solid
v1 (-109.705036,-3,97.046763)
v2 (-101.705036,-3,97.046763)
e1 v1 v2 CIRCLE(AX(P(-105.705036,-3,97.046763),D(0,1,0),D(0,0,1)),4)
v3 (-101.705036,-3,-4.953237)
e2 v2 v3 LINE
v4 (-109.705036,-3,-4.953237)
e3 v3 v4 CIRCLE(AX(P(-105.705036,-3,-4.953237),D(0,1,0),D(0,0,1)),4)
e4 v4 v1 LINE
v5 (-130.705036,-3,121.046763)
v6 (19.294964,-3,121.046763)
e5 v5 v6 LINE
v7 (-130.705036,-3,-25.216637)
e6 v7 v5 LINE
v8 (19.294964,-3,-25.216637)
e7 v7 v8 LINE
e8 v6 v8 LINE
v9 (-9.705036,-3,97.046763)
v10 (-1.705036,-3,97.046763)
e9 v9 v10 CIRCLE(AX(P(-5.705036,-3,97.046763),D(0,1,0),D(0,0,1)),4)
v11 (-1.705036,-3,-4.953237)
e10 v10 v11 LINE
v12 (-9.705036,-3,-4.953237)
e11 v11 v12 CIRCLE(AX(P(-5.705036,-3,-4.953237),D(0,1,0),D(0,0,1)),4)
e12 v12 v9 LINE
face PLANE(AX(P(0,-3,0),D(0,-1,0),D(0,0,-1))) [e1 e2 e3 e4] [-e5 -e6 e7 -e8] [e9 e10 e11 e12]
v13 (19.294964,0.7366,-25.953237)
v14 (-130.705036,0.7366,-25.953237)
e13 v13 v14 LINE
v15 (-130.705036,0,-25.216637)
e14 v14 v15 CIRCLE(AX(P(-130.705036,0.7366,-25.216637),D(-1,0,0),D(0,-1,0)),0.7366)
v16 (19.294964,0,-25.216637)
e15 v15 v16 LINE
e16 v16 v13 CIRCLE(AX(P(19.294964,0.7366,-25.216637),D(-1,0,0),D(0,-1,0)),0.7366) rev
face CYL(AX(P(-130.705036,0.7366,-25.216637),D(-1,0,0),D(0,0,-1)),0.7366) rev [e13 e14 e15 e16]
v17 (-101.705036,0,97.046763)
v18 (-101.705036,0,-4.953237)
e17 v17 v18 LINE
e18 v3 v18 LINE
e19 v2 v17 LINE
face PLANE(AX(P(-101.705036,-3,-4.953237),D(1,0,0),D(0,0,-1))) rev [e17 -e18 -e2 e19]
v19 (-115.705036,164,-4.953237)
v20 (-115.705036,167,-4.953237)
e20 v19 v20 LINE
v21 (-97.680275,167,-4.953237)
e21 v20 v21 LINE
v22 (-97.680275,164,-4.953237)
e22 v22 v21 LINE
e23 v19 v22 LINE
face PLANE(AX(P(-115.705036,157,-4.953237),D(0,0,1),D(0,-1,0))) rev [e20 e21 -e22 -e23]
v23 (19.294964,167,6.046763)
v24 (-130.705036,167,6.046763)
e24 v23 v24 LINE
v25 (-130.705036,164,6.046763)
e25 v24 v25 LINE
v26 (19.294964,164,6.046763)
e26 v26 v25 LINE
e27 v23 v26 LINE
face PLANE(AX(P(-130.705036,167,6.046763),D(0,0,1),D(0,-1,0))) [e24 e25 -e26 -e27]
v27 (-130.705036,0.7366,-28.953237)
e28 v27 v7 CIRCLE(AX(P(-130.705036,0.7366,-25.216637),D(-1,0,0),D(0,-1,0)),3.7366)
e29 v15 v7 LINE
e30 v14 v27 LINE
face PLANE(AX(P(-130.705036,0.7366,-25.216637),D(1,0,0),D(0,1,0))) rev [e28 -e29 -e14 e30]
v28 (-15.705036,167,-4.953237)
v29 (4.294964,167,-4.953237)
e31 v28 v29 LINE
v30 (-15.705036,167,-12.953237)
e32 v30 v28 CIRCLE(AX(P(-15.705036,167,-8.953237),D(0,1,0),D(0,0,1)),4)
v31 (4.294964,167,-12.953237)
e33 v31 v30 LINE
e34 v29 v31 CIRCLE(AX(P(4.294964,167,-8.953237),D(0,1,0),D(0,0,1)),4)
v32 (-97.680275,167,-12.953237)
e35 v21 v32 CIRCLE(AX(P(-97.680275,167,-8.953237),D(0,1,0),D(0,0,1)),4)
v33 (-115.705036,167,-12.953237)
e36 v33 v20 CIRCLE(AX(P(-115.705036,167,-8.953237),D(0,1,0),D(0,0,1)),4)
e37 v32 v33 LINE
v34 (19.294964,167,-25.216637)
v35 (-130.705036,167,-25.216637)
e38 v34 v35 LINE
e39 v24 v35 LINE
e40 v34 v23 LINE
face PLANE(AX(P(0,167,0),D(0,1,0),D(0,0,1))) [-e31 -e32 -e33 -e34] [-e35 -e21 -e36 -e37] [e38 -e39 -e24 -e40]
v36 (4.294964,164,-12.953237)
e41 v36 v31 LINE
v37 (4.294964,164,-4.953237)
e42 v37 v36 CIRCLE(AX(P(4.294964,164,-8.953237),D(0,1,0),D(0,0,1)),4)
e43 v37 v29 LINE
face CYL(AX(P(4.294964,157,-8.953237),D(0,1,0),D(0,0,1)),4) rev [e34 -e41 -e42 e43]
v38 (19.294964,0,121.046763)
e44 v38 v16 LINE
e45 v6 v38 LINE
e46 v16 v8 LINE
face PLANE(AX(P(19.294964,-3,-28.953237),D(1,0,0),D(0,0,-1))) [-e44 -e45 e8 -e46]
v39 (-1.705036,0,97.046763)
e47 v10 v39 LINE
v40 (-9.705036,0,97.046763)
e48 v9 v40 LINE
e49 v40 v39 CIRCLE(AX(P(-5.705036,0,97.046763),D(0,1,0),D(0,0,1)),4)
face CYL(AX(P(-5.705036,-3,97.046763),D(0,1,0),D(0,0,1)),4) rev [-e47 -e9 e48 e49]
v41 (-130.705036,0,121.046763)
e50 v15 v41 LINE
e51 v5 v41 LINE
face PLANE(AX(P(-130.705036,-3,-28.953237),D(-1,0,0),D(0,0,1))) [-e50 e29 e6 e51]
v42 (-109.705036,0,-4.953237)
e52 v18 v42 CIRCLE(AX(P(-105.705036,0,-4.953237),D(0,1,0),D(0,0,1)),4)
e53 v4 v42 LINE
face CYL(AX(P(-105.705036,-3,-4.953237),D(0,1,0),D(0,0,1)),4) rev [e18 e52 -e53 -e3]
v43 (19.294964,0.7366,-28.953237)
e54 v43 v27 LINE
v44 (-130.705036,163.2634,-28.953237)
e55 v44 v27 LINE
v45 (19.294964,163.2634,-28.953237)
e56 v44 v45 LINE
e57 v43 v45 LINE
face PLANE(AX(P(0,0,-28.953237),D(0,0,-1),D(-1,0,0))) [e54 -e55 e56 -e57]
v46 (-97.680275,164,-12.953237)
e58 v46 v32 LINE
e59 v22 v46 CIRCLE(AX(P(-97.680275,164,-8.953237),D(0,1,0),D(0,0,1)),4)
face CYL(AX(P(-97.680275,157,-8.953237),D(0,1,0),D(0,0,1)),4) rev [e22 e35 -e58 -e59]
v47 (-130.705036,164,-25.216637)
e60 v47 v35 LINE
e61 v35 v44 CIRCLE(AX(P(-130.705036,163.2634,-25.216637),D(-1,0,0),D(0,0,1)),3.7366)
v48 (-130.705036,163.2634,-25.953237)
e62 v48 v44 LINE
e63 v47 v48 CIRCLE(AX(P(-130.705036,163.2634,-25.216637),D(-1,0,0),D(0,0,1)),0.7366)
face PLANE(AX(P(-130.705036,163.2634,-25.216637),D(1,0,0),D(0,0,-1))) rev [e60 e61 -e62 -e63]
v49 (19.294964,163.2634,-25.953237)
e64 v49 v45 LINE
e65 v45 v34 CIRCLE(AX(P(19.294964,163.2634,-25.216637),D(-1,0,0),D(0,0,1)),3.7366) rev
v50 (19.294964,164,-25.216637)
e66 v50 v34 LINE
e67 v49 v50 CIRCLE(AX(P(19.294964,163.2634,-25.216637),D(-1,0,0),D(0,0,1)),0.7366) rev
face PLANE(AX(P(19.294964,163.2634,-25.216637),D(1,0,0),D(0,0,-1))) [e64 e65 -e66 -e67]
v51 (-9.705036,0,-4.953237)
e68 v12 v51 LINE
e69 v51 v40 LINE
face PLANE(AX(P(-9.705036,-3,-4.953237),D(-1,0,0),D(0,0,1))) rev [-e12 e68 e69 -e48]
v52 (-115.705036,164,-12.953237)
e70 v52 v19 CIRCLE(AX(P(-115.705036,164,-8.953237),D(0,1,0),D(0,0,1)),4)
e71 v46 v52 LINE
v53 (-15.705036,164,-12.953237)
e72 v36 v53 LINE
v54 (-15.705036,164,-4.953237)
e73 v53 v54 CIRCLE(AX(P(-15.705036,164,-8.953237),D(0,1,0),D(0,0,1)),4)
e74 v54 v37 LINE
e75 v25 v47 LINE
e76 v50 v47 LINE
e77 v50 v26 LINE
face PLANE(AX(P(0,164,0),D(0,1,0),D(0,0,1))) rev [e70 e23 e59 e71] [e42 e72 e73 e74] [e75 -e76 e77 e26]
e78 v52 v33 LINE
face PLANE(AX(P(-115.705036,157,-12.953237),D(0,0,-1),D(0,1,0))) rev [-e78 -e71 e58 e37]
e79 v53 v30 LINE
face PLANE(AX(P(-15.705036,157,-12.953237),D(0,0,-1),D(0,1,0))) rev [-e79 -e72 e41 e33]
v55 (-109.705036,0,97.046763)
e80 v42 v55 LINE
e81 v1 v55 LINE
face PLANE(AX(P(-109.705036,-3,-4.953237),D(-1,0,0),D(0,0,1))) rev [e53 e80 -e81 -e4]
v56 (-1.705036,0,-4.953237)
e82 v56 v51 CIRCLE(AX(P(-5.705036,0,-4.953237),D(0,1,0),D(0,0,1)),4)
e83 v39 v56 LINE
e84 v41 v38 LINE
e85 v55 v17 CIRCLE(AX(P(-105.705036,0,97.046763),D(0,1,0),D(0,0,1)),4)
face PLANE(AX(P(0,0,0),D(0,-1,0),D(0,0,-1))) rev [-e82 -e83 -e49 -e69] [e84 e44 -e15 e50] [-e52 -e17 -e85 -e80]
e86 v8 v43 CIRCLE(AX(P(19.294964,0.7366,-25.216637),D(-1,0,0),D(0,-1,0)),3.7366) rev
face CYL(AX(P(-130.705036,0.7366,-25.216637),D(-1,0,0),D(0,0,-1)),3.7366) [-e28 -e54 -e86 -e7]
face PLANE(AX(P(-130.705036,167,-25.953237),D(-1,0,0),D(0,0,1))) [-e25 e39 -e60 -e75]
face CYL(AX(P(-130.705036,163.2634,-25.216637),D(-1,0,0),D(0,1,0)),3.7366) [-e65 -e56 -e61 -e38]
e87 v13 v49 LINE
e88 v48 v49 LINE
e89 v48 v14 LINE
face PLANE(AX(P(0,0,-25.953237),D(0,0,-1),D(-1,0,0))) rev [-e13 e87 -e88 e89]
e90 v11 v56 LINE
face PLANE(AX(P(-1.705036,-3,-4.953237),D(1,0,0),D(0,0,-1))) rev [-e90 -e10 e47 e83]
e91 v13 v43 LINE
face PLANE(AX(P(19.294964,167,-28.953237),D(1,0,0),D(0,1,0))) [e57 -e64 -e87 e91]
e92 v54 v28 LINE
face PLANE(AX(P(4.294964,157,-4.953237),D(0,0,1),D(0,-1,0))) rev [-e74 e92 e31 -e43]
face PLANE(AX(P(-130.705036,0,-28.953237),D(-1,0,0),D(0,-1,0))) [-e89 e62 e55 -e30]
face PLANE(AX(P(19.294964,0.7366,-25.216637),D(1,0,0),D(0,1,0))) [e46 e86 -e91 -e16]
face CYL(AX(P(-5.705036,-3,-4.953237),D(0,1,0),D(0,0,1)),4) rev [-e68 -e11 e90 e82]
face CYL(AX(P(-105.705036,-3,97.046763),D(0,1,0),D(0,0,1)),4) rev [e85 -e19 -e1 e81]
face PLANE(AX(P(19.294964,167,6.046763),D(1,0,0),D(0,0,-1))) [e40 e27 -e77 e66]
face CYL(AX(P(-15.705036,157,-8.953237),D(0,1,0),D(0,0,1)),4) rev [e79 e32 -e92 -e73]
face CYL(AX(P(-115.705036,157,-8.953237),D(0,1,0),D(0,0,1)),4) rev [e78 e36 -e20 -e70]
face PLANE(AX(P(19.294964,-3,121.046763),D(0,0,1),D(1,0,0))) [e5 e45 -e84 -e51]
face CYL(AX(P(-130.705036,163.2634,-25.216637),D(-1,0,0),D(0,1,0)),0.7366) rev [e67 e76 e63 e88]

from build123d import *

# Parameters (mm, degrees)
SKETCH1_W                    = 150
SKETCH1_H                    = 150
BASE_FLANGE1_DEPTH           = 3
EDGE_FLANGE1_STRIP_W         = 13.4732
EDGE_FLANGE1_STRIP_H         = 3
EDGE_FLANGE1_STRIP_CUT_DEPTH = 150
EDGE_FLANGE1_DEPTH           = 150
EDGE_FLANGE2_STRIP_W         = 13.4732
EDGE_FLANGE2_STRIP_H         = 3
EDGE_FLANGE2_STRIP_CUT_DEPTH = 150
EDGE_FLANGE2_DEPTH           = 150
CUT_EXTRUDE1_DEPTH           = 10


# Sheet-metal steps are written as plain solids
with BuildPart() as part:
    # Sketch1 → Base-Flange1 (new body)
    with BuildSketch(Plane(origin=(0, 0, 0), x_dir=(1, 0, 0), z_dir=(0, 1, 0))):
        with Locations((-55.705035971, -46.04676259)):
            Rectangle(SKETCH1_W, SKETCH1_H)
        with BuildLine():
            Line((-101.705035971, 4.95323741), (-101.705035971, -97.04676259))
            ThreePointArc((-101.705035971, -97.04676259), (-105.705035971, -101.04676259), (-109.705035971, -97.04676259))
            Line((-109.705035971, -97.04676259), (-109.705035971, 4.95323741))
            ThreePointArc((-109.705035971, 4.95323741), (-105.705035971, 8.95323741), (-101.705035971, 4.95323741))
        make_face(mode=Mode.SUBTRACT)
        with BuildLine():
            Line((-1.705035971, 4.95323741), (-1.705035971, -97.04676259))
            ThreePointArc((-1.705035971, -97.04676259), (-5.705035971, -101.04676259), (-9.705035971, -97.04676259))
            Line((-9.705035971, -97.04676259), (-9.705035971, 4.95323741))
            ThreePointArc((-9.705035971, 4.95323741), (-5.705035971, 8.95323741), (-1.705035971, 4.95323741))
        make_face(mode=Mode.SUBTRACT)
    extrude(amount=-BASE_FLANGE1_DEPTH)

    # Edge-Flange1 strip (across the edge) → Edge-Flange1 strip cut (cut)
    with BuildSketch(Plane(origin=(19.294964029, 0, -28.95323741), x_dir=(0, 0, 1), z_dir=(-1, 0, 0))):
        with Locations((-3, -1.5)):
            Rectangle(EDGE_FLANGE1_STRIP_W, EDGE_FLANGE1_STRIP_H)
    extrude(amount=EDGE_FLANGE1_STRIP_CUT_DEPTH, mode=Mode.SUBTRACT)

    # Edge-Flange1 section (across the edge) → Edge-Flange1 (add)
    with BuildSketch(Plane(origin=(19.294964029, 0, -28.95323741), x_dir=(0, 0, 1), z_dir=(-1, 0, 0))):
        with BuildLine():
            Line((0, 0.7366), (0, 167))
            Line((0, 167), (3, 167))
            Line((3, 167), (3, 0.7366))
            ThreePointArc((3, 0.7366), (3.215745145, 0.215745145), (3.7366, 0))
            Line((3.7366, 0), (3.7366, -3))
            ThreePointArc((3.7366, -3), (1.094424801, -1.905575199), (0, 0.7366))
        make_face()
    extrude(amount=EDGE_FLANGE1_DEPTH)

    # Edge-Flange2 strip (across the edge) → Edge-Flange2 strip cut (cut)
    with BuildSketch(Plane(origin=(19.294964029, 167, -25.95323741), x_dir=(0, -1, 0), z_dir=(-1, 0, 0))):
        with Locations((-3, -1.5)):
            Rectangle(EDGE_FLANGE2_STRIP_W, EDGE_FLANGE2_STRIP_H)
    extrude(amount=EDGE_FLANGE2_STRIP_CUT_DEPTH, mode=Mode.SUBTRACT)

    # Edge-Flange2 section (across the edge) → Edge-Flange2 (add)
    with BuildSketch(Plane(origin=(19.294964029, 167, -25.95323741), x_dir=(0, -1, 0), z_dir=(-1, 0, 0))):
        with BuildLine():
            Line((0, 0.7366), (0, 32))
            Line((0, 32), (3, 32))
            Line((3, 32), (3, 0.7366))
            ThreePointArc((3, 0.7366), (3.215745145, 0.215745145), (3.7366, 0))
            Line((3.7366, 0), (3.7366, -3))
            ThreePointArc((3.7366, -3), (1.094424801, -1.905575199), (0, 0.7366))
        make_face()
    extrude(amount=EDGE_FLANGE2_DEPTH)

    # Sketch12 → Cut-Extrude1 (cut)
    with BuildSketch(Plane(origin=(0, 167, 0), x_dir=(1, 0, 0), z_dir=(0, 1, 0))):
        with BuildLine():
            Line((4.294964029, 4.95323741), (-15.705035971, 4.95323741))
            ThreePointArc((-15.705035971, 4.95323741), (-19.705035971, 8.95323741), (-15.705035971, 12.95323741))
            Line((-15.705035971, 12.95323741), (4.294964029, 12.95323741))
            ThreePointArc((4.294964029, 12.95323741), (8.294964029, 8.95323741), (4.294964029, 4.95323741))
        make_face()
        with BuildLine():
            Line((-115.705035971, 4.95323741), (-97.680274897, 4.95323741))
            ThreePointArc((-97.680274897, 4.95323741), (-93.680274897, 8.95323741), (-97.680274897, 12.95323741))
            Line((-97.680274897, 12.95323741), (-115.705035971, 12.95323741))
            ThreePointArc((-115.705035971, 12.95323741), (-119.705035971, 8.95323741), (-115.705035971, 4.95323741))
        make_face()
    extrude(amount=-CUT_EXTRUDE1_DEPTH, mode=Mode.SUBTRACT)


solid = part.part
